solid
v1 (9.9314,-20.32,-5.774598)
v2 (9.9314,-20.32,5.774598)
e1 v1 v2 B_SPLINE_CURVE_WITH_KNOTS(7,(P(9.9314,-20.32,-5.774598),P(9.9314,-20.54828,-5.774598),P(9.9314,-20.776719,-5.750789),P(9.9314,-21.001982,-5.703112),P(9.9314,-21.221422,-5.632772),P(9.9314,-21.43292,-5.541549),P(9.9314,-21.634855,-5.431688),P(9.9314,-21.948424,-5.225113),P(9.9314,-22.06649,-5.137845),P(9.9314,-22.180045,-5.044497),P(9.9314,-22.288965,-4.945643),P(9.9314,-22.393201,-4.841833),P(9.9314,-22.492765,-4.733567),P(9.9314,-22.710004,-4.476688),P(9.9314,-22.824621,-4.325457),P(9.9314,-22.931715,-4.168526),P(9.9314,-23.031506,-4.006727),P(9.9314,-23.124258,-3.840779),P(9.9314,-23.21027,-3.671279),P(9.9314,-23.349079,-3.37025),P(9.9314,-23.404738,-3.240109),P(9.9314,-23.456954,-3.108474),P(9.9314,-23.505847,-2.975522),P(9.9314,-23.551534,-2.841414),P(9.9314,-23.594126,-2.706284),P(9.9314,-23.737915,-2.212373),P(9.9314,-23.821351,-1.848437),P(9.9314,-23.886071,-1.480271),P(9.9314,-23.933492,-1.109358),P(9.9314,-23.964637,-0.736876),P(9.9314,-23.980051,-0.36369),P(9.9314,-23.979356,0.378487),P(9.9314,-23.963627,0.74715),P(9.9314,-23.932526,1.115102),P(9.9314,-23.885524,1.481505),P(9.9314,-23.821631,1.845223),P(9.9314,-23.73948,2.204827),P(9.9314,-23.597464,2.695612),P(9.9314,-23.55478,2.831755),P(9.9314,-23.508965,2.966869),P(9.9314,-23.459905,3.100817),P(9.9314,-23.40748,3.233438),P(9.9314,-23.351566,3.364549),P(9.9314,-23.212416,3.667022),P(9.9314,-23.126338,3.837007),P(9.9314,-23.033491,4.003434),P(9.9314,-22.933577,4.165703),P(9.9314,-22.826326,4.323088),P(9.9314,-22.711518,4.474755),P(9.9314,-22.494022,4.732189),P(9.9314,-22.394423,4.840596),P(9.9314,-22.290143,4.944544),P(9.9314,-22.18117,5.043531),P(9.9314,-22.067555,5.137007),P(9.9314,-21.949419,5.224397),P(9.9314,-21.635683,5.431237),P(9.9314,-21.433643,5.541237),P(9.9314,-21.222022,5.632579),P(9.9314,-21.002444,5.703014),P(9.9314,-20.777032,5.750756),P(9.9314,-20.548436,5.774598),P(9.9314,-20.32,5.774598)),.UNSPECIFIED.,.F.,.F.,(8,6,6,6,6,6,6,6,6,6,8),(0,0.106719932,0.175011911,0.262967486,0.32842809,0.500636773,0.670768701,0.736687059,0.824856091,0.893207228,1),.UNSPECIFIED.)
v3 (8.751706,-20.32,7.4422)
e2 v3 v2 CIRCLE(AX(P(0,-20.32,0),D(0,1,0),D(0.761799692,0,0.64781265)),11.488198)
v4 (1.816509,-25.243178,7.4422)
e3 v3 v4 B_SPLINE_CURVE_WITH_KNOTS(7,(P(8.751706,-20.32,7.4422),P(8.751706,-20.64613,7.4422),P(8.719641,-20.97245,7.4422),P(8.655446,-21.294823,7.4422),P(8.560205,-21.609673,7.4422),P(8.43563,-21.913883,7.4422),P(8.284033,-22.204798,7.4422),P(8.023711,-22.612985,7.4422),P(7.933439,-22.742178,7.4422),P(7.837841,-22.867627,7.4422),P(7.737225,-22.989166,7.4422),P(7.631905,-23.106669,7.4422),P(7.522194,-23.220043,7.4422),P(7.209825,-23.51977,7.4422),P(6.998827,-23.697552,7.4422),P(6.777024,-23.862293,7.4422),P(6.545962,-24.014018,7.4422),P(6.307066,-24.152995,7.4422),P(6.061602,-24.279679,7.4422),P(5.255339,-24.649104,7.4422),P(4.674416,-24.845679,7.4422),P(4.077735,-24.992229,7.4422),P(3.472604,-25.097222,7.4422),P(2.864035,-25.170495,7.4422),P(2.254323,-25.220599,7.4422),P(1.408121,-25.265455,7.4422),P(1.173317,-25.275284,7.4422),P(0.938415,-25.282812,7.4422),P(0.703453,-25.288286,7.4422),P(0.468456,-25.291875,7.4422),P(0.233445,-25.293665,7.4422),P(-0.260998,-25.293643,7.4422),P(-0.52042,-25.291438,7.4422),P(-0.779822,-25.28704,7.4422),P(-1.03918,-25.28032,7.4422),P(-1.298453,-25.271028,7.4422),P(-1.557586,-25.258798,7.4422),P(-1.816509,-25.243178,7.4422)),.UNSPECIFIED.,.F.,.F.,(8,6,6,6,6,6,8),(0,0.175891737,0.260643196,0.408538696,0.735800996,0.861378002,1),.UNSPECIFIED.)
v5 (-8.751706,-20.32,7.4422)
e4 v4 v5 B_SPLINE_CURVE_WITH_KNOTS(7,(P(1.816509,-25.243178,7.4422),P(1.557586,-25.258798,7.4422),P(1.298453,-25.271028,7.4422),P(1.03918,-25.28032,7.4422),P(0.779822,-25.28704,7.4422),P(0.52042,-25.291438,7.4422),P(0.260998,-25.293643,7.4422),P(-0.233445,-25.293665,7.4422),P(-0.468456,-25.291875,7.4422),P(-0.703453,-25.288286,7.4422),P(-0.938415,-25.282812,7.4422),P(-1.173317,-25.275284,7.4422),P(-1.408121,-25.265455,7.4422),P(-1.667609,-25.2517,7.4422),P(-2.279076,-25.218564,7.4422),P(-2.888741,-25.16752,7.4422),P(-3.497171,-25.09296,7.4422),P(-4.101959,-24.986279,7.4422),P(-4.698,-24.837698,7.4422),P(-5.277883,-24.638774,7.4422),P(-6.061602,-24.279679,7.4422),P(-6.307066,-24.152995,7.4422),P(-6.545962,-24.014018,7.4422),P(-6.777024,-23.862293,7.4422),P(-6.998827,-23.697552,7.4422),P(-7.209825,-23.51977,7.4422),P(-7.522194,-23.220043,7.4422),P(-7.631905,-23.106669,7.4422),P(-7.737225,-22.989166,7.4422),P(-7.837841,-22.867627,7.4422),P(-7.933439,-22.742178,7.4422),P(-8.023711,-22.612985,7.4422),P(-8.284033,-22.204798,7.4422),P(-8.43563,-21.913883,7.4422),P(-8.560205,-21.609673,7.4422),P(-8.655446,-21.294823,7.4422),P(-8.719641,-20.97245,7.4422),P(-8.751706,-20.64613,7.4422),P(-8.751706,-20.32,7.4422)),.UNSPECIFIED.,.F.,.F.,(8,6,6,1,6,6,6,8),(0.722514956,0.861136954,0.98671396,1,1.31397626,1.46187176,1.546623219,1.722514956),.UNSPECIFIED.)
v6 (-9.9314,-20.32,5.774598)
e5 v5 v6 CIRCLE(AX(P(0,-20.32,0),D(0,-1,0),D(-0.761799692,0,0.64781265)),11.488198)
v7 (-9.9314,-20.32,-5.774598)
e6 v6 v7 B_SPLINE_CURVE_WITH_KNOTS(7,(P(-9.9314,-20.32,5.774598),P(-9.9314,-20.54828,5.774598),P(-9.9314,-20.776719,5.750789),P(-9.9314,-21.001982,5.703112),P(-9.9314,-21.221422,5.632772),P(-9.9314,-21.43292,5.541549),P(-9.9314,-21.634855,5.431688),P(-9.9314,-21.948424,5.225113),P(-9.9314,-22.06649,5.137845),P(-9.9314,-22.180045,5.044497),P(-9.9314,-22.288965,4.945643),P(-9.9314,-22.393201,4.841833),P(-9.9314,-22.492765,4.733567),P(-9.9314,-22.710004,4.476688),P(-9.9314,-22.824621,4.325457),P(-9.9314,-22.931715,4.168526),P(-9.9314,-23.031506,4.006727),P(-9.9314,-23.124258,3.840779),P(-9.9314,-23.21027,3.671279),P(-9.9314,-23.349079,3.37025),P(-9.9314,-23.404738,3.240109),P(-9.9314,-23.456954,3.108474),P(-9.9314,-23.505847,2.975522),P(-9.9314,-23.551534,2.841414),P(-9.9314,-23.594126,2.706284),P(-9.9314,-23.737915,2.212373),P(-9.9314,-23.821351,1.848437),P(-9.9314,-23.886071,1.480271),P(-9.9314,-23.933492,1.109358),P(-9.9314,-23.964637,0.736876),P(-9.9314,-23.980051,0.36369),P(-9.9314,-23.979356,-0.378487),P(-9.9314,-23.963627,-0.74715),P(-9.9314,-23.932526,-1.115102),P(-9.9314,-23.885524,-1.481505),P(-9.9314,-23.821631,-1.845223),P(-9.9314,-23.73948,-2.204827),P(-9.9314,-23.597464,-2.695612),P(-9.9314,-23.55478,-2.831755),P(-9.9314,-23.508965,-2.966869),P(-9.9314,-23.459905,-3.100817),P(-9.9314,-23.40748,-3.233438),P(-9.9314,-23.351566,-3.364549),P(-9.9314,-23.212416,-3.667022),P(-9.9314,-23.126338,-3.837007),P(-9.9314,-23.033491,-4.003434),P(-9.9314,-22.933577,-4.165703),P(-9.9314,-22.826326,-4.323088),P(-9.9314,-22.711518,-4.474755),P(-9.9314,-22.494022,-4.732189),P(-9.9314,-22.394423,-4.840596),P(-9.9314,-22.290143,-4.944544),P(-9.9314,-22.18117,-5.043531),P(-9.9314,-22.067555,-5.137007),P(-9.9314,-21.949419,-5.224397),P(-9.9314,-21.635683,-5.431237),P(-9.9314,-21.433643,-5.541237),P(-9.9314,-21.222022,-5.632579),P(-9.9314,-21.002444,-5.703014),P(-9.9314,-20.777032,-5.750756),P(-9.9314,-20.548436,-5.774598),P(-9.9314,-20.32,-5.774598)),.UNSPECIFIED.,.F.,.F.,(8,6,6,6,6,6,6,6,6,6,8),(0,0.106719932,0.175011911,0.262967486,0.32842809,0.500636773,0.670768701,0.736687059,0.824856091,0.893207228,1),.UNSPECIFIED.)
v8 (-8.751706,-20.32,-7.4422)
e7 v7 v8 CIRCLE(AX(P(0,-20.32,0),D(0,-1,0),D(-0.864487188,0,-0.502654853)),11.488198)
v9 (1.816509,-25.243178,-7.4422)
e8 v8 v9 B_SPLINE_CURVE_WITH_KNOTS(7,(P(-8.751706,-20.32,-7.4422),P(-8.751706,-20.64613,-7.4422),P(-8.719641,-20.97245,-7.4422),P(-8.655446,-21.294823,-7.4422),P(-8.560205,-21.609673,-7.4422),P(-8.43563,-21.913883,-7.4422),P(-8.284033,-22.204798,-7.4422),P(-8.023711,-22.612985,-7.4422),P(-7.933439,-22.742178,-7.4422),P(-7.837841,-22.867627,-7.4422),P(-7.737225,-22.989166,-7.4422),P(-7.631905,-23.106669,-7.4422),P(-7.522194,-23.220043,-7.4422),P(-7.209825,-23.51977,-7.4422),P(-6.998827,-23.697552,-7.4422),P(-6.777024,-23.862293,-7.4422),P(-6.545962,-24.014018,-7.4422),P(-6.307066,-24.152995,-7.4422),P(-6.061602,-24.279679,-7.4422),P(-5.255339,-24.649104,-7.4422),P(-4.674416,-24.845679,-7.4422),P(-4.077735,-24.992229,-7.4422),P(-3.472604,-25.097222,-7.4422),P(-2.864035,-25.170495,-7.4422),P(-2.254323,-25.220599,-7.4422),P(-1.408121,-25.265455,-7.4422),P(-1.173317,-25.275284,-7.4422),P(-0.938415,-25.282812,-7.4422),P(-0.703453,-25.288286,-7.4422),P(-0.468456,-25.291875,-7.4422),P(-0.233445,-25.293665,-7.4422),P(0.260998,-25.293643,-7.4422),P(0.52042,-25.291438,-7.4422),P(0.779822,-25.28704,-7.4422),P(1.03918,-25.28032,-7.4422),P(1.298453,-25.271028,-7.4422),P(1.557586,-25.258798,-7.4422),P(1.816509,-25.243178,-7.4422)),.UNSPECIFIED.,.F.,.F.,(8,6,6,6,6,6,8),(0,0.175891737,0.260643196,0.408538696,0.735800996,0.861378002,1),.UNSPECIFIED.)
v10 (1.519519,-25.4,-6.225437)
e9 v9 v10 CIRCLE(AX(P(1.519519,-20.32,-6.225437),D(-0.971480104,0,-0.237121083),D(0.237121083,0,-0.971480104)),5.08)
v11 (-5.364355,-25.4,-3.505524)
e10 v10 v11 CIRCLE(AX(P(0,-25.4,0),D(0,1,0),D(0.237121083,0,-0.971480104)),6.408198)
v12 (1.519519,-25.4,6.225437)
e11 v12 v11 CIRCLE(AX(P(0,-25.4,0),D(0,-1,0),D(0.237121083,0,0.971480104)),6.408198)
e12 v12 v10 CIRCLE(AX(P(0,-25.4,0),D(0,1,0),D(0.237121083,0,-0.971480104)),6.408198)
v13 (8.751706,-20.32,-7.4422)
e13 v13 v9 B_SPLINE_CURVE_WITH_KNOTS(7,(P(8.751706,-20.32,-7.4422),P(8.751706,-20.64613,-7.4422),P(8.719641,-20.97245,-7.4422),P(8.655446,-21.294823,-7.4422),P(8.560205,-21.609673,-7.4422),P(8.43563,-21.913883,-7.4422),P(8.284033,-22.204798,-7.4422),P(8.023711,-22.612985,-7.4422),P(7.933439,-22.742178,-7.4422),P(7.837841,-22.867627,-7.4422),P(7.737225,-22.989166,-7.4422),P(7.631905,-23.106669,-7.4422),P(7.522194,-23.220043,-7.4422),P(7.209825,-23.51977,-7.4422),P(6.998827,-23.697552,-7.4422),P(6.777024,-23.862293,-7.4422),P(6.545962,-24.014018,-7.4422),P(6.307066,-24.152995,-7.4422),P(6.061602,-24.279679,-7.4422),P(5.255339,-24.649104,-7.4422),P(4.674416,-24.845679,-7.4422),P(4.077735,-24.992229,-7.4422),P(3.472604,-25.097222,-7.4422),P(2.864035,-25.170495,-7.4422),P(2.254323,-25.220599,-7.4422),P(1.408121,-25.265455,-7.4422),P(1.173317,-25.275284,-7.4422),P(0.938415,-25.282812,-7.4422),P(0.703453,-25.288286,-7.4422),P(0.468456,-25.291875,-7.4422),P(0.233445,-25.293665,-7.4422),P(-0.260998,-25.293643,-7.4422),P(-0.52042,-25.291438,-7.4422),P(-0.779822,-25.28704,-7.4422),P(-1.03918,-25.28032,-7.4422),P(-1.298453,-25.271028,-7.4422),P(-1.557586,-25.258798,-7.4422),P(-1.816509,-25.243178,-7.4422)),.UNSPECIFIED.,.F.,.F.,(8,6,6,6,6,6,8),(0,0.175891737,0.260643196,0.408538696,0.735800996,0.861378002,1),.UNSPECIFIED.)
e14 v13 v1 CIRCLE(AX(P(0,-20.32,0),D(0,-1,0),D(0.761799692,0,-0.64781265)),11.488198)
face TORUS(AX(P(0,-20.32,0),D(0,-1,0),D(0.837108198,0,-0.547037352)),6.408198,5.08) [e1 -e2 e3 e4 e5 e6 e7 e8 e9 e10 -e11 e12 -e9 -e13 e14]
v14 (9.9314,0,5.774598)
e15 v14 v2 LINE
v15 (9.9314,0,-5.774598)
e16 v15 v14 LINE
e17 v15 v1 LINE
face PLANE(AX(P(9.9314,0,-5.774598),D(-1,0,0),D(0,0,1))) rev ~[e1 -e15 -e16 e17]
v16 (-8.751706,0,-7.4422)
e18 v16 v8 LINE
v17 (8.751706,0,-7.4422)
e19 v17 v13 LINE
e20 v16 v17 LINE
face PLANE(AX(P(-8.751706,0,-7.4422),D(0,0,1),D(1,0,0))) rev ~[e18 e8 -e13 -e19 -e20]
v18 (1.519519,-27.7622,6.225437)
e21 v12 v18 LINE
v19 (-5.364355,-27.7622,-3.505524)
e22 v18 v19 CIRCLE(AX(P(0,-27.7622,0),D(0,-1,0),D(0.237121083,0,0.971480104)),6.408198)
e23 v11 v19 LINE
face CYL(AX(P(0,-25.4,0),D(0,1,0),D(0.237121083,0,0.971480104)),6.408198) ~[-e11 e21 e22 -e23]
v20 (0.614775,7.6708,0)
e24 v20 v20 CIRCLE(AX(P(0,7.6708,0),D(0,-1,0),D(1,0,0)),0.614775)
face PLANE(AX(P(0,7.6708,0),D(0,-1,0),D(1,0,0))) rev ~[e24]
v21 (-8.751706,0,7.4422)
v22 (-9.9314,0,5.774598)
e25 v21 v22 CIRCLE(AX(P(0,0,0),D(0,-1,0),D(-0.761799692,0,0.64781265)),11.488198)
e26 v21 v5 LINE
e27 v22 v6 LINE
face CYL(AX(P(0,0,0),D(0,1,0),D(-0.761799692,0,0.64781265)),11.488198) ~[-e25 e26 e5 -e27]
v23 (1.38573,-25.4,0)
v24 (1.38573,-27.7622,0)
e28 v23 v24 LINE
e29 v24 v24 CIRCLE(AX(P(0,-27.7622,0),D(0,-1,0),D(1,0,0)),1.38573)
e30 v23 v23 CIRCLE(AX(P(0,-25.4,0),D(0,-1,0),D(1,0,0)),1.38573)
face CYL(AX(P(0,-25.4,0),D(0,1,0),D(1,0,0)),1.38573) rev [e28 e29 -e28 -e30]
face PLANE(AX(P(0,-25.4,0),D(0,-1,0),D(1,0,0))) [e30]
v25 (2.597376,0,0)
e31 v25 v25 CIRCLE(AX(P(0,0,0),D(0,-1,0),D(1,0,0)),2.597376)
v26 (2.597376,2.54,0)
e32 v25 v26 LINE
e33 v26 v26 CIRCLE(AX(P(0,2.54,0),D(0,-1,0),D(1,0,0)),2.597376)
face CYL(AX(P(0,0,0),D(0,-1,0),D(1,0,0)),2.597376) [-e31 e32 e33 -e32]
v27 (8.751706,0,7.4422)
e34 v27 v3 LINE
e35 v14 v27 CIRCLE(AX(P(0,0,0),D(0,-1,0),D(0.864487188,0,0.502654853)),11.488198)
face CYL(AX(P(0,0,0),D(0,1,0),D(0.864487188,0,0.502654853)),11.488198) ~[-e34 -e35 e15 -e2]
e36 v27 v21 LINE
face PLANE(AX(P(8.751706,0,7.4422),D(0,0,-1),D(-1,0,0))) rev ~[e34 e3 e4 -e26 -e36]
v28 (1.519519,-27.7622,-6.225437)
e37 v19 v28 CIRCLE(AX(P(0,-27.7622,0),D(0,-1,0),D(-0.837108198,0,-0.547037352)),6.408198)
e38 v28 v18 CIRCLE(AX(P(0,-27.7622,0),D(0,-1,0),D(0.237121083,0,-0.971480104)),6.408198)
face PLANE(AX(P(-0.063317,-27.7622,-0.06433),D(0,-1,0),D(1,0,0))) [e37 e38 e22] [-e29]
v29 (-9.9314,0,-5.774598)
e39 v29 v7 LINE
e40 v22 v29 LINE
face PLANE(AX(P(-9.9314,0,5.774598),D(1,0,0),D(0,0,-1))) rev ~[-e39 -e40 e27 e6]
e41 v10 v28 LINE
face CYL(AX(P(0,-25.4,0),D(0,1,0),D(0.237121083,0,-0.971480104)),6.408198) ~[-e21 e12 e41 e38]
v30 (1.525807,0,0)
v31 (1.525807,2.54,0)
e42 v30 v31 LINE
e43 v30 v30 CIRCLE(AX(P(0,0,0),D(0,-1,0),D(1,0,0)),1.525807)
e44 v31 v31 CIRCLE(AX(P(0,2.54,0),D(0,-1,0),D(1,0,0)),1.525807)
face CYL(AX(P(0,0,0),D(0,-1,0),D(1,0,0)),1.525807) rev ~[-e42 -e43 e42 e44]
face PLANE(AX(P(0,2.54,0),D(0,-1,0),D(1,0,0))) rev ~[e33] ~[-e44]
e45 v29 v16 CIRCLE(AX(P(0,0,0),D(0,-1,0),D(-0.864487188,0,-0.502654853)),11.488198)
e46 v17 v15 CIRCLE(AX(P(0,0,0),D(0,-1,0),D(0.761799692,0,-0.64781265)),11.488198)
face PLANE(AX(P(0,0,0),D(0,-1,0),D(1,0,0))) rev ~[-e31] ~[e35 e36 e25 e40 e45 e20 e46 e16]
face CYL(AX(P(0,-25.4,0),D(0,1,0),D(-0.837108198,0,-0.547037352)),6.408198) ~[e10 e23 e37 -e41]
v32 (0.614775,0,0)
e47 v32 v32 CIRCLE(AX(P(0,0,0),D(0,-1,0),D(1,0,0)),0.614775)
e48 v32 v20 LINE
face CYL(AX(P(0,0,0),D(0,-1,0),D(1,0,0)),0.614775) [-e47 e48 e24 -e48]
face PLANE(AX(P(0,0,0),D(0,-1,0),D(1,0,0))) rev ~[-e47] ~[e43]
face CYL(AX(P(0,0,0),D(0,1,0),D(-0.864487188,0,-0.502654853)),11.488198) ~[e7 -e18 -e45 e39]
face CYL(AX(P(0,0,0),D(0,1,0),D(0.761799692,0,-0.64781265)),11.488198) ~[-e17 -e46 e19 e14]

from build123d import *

# Parameters (mm, degrees)
F1_DEPTH    = 25.4
F2_T2_ANGLE = 136.8806858284
F2_T4_ANGLE = 136.8806858284
F2_T6_ANGLE = 136.8806858284
F2_T8_ANGLE = 136.8806858285
F3_R        = 1.3857299945
F4_DEPTH    = 2.3622
F5_R        = 2.5973758292
F5_R_2      = 1.5258073578
F6_DEPTH    = 2.54
F7_R        = 0.6147751451
F8_DEPTH    = 7.6708


# Not quite as in the source:
# - a fillet or chamfer that OpenCascade refuses, or shapes differently, is made with other operations: its cross-section is extruded or revolved along the edge and cut away or added
# - a feature names something its author has since deleted; it is built from what else it names


with BuildPart() as f1:
    # F0 (on Front) → F1 (new body)
    with BuildSketch(Plane.XZ):
        with BuildLine():
            Line((9.9314, -5.7745984882), (9.9314, 5.7745984882))
            ThreePointArc((9.9314, 5.7745984882), (9.3786903902, 6.6346710713), (8.7517057092, 7.4422))
            Line((8.7517057092, 7.4422), (-8.7517057092, 7.4422))
            ThreePointArc((-8.7517057092, 7.4422), (-9.3786903902, 6.6346710713), (-9.9314, 5.7745984882))
            Line((-9.9314, 5.7745984882), (-9.9314, -5.7745984882))
            ThreePointArc((-9.9314, -5.7745984882), (-9.3786903902, -6.6346710713), (-8.7517057092, -7.4422))
            Line((-8.7517057092, -7.4422), (8.7517057092, -7.4422))
            ThreePointArc((8.7517057092, -7.4422), (9.3786903902, -6.6346710713), (9.9314, -5.7745984882))
        make_face()
    extrude(amount=F1_DEPTH)

    # F2: fillet of radius 5.08 on 4 edges, made by hand

    # F2_s1 → F2_t2 (revolve, cut)
    with BuildSketch(Plane(origin=(0, 0, 0), x_dir=(0, 1, 0), z_dir=(0.9714801037, 0, -0.2371210832))):
        with BuildLine():
            ThreePointArc((-20.32, 11.4881980162), (-23.9121024484, 10.0003004647), (-25.4, 6.4081980162))
            Line((-25.4, 6.4081980162), (-25.4, 11.4881980162))
            Line((-25.4, 11.4881980162), (-20.32, 11.4881980162))
        make_face()
    revolve(axis=Axis((0, -25.4, 0), (0, -1, 0)), revolution_arc=F2_T2_ANGLE, mode=Mode.SUBTRACT)

    # F2_s3 → F2_t4 (revolve, cut)
    with BuildSketch(Plane(origin=(0, 0, 0), x_dir=(0, 1, 0), z_dir=(-0.5470373523, 0, -0.837108198))):
        with BuildLine():
            ThreePointArc((-20.32, 11.4881980162), (-23.9121024484, 10.0003004647), (-25.4, 6.4081980162))
            Line((-25.4, 6.4081980162), (-25.4, 11.4881980162))
            Line((-25.4, 11.4881980162), (-20.32, 11.4881980162))
        make_face()
    revolve(axis=Axis((0, -25.4, 0), (0, -1, 0)), revolution_arc=F2_T4_ANGLE, mode=Mode.SUBTRACT)

    # F2_s5 → F2_t6 (revolve, cut)
    with BuildSketch(Plane(origin=(0, 0, 0), x_dir=(0, 1, 0), z_dir=(0.5470373523, 0, 0.837108198))):
        with BuildLine():
            ThreePointArc((-20.32, 11.4881980162), (-23.9121024484, 10.0003004647), (-25.4, 6.4081980162))
            Line((-25.4, 6.4081980162), (-25.4, 11.4881980162))
            Line((-25.4, 11.4881980162), (-20.32, 11.4881980162))
        make_face()
    revolve(axis=Axis((0, -25.4, 0), (0, -1, 0)), revolution_arc=F2_T6_ANGLE, mode=Mode.SUBTRACT)

    # F2_s7 → F2_t8 (revolve, cut)
    with BuildSketch(Plane(origin=(0, 0, 0), x_dir=(0, 1, 0), z_dir=(-0.9714801037, 0, 0.2371210832))):
        with BuildLine():
            ThreePointArc((-20.32, 11.4881980162), (-23.9121024484, 10.0003004647), (-25.4, 6.4081980162))
            Line((-25.4, 6.4081980162), (-25.4, 11.4881980162))
            Line((-25.4, 11.4881980162), (-20.32, 11.4881980162))
        make_face()
    revolve(axis=Axis((0, -25.4, 0), (0, -1, 0)), revolution_arc=F2_T8_ANGLE, mode=Mode.SUBTRACT)

    # F3 (on face) → F4 (join)
    with BuildSketch(Plane.XZ.offset(25.4)):
        with BuildLine():
            ThreePointArc((1.5195188547, 6.2254368734), (-5.231499759, 3.7008663967), (-5.364355094, -3.5055236756))
            ThreePointArc((-5.364355094, -3.5055236756), (-2.3548191815, -5.9598513771), (1.5195188547, -6.2254368734))
            ThreePointArc((1.5195188547, -6.2254368734), (3.7008663967, -5.231499759), (5.364355094, -3.5055236756))
            ThreePointArc((5.364355094, -3.5055236756), (5.9598513771, 2.3548191815), (1.5195188547, 6.2254368734))
        make_face()
        Circle(F3_R, mode=Mode.SUBTRACT)
    extrude(amount=F4_DEPTH)

    # F5 (on face) → F6 (join)
    with BuildSketch(Plane.XZ):
        Circle(F5_R)
        Circle(F5_R_2, mode=Mode.SUBTRACT)
    extrude(amount=-F6_DEPTH)

    # F7 (on Front) → F8 (join)
    with BuildSketch(Plane.XZ):
        Circle(F7_R)
    extrude(amount=-F8_DEPTH)


solid = f1.part
